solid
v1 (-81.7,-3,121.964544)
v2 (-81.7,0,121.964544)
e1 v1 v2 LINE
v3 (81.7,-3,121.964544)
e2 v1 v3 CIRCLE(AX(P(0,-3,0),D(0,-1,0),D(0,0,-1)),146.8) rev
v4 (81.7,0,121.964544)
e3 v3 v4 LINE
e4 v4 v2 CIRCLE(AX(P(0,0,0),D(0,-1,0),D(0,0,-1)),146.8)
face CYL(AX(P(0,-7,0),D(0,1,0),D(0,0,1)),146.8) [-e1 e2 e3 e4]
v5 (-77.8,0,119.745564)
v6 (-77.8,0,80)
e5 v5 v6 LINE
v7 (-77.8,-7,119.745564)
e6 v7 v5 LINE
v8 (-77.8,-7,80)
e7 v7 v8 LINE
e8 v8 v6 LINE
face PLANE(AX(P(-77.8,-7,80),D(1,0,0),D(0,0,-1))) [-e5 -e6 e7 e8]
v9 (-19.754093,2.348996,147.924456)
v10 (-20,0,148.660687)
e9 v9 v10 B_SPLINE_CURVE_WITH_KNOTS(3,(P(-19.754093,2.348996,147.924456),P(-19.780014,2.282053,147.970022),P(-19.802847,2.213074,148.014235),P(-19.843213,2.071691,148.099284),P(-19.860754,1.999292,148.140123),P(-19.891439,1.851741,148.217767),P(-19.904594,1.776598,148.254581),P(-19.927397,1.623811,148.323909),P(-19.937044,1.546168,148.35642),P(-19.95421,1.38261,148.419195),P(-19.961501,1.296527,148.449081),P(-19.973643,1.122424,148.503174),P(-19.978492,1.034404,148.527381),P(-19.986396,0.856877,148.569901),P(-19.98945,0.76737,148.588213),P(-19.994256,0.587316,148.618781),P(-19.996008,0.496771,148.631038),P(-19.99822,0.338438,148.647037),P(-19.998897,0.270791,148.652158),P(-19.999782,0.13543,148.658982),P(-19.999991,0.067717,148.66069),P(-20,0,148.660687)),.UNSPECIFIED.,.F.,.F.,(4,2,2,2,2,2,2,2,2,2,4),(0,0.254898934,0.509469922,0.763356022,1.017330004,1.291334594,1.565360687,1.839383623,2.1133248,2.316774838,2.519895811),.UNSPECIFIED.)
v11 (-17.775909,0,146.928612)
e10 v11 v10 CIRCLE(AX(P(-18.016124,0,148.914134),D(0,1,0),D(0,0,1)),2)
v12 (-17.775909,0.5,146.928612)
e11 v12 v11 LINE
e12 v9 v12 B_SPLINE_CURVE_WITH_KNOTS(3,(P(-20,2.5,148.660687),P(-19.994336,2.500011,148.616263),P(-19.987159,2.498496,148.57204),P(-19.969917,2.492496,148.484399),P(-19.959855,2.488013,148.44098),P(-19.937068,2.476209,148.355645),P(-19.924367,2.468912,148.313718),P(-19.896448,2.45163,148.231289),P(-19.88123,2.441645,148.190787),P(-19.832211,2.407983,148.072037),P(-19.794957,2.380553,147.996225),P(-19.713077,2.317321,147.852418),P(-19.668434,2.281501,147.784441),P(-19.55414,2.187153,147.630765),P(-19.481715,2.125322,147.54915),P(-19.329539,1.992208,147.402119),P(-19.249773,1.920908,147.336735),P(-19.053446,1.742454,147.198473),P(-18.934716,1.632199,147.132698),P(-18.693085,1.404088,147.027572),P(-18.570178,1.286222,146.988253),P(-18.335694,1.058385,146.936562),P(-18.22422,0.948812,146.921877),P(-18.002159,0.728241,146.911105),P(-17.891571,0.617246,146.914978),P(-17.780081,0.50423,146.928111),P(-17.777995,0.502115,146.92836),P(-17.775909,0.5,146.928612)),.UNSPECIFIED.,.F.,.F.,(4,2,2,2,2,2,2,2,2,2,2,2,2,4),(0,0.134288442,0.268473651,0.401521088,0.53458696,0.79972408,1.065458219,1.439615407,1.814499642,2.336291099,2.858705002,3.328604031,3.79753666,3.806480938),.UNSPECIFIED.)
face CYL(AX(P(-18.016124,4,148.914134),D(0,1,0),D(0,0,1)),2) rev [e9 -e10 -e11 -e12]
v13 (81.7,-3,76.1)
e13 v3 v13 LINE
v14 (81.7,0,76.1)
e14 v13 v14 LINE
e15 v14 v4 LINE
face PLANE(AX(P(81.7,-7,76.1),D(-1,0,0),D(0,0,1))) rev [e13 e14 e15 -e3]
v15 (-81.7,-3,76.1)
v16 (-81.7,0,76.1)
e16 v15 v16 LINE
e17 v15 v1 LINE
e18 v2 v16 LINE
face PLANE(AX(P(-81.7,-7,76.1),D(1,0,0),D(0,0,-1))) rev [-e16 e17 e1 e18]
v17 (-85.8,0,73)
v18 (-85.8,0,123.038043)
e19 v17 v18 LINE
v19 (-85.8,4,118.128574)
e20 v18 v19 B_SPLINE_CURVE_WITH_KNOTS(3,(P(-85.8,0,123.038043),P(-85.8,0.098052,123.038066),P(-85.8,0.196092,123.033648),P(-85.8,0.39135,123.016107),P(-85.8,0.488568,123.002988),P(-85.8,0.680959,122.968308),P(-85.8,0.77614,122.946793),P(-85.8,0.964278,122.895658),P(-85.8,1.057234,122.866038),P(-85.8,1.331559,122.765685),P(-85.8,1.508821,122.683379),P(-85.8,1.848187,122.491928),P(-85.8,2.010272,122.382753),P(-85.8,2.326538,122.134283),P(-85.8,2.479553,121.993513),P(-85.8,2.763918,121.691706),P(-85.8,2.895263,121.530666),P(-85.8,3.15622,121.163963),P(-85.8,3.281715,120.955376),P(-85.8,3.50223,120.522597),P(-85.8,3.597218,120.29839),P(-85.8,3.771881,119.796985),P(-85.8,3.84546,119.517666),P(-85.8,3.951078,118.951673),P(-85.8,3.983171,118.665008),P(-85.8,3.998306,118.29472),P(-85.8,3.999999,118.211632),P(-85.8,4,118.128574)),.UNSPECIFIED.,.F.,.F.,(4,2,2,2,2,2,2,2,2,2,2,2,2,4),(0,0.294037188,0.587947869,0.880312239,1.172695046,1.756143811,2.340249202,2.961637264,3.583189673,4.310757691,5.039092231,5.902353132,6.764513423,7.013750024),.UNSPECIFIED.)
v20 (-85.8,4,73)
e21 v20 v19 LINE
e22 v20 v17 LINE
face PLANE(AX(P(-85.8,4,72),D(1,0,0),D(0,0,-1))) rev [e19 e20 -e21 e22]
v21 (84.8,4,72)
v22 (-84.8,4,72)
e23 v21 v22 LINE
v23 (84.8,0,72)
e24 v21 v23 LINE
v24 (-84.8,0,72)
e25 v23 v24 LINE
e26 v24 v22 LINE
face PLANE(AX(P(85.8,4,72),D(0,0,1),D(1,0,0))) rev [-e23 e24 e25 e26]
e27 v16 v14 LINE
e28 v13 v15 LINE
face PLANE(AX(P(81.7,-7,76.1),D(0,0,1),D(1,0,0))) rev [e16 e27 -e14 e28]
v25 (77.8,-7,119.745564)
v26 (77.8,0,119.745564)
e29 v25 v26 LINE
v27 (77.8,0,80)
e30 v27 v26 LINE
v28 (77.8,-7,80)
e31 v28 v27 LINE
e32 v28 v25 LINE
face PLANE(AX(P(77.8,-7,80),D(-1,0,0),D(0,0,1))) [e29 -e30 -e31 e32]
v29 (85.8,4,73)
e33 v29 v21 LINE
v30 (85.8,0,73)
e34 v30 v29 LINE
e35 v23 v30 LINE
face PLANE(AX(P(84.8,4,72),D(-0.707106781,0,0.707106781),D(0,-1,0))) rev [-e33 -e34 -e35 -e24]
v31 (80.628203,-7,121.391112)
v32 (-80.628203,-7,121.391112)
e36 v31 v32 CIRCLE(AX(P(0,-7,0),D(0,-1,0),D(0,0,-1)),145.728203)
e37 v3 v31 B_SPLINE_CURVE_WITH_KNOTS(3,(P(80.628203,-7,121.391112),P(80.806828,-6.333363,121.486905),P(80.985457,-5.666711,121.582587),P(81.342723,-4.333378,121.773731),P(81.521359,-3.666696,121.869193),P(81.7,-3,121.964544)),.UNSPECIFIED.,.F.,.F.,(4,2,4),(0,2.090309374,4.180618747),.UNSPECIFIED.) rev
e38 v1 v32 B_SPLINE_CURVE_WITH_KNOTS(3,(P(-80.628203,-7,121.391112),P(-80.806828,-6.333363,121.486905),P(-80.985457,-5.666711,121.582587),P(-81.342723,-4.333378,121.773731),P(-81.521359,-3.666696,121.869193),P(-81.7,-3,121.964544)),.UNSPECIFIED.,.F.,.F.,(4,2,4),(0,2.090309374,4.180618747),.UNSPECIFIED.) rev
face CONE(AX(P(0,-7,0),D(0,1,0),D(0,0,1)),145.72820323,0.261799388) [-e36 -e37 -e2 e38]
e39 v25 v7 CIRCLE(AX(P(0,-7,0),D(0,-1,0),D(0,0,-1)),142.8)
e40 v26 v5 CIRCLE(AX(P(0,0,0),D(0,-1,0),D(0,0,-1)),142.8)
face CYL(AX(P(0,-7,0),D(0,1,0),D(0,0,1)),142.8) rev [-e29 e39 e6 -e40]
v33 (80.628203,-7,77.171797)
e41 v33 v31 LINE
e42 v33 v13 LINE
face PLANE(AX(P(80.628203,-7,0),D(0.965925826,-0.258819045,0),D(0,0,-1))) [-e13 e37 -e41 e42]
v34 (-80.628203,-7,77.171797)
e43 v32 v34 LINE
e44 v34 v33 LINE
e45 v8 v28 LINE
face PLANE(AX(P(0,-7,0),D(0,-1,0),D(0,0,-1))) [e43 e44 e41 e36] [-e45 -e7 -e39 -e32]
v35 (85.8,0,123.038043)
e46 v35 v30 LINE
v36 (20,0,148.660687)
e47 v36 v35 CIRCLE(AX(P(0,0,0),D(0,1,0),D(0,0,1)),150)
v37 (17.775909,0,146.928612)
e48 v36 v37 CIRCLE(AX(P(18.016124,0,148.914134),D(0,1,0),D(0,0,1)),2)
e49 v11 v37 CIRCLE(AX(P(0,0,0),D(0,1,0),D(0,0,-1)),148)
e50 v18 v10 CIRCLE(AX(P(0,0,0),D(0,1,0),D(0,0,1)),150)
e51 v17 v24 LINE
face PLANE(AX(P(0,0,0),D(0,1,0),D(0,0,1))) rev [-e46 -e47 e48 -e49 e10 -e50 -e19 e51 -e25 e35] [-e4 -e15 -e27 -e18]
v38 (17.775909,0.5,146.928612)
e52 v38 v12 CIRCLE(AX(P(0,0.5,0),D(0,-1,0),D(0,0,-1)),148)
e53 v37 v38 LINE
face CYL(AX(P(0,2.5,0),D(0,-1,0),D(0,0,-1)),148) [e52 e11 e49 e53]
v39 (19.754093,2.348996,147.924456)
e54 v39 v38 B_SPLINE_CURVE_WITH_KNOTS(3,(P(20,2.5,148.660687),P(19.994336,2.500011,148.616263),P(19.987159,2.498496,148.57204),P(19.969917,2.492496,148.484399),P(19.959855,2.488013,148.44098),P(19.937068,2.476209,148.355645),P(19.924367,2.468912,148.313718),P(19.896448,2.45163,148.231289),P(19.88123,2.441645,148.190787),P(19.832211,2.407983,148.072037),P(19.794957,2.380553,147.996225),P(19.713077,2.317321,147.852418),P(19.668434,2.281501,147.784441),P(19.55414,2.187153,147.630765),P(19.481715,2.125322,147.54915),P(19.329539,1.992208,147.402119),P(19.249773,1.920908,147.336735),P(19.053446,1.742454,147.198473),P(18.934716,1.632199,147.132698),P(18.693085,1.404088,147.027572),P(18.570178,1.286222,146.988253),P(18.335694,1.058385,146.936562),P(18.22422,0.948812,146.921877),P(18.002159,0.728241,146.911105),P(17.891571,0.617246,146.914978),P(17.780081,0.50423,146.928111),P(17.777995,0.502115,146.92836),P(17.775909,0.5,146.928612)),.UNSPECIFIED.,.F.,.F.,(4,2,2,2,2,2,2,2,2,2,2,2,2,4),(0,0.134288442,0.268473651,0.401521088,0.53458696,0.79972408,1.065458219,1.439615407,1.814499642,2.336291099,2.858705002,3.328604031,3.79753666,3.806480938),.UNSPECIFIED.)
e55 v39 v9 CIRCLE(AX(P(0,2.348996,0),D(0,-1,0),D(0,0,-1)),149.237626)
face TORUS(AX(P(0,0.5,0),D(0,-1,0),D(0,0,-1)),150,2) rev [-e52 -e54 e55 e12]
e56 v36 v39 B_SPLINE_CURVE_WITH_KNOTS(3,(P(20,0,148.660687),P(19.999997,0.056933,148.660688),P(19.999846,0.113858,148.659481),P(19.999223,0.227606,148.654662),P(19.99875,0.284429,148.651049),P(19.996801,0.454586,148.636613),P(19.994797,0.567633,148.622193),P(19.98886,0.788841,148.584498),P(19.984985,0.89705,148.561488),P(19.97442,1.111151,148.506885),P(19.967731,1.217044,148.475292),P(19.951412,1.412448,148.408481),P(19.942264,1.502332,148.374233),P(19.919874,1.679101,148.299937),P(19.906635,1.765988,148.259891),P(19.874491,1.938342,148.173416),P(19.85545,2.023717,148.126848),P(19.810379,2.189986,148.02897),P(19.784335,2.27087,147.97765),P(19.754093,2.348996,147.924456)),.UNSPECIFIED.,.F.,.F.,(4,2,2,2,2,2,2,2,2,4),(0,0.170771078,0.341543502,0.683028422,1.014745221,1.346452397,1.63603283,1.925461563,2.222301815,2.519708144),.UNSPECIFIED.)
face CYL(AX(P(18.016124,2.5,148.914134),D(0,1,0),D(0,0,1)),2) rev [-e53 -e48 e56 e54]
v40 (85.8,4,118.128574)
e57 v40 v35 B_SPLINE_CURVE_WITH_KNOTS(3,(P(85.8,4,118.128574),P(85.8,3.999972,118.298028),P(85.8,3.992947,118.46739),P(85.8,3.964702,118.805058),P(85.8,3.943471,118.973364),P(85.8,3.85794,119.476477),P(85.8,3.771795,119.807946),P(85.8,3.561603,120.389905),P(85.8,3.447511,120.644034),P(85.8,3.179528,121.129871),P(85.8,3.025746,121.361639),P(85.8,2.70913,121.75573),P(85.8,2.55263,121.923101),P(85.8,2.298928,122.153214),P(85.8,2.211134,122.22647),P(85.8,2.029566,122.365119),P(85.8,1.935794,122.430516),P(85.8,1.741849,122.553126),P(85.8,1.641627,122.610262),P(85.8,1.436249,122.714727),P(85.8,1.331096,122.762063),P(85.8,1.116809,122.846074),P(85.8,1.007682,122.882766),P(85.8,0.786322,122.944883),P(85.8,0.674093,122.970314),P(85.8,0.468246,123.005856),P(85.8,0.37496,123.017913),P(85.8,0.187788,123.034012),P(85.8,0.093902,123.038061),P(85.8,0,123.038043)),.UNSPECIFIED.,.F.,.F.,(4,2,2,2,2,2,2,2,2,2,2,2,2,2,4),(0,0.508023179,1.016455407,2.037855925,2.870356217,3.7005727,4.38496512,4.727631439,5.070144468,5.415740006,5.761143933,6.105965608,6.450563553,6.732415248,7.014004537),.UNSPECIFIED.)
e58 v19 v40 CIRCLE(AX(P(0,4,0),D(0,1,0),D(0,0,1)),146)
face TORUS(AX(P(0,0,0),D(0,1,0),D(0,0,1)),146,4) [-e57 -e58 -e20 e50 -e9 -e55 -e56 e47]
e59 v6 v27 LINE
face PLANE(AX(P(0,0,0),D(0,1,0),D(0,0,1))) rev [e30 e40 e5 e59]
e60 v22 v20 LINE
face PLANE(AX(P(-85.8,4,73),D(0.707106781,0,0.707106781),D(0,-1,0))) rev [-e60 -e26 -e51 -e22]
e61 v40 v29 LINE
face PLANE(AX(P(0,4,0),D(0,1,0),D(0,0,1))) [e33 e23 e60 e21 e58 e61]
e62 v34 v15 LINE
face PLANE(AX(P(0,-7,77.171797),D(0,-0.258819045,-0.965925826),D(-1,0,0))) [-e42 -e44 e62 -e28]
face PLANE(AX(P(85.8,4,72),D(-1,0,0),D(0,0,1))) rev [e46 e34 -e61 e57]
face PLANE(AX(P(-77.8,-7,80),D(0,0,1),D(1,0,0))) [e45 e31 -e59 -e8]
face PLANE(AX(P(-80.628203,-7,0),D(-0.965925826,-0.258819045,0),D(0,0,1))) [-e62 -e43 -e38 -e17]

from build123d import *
from OCP.BRepFilletAPI import BRepFilletAPI_MakeChamfer

# Parameters (mm, degrees)
EXTRUDE_1_DEPTH     = 4
CHAMFER_1_SIZE      = 1
EXTRUDE_2_DEPTH     = 7
CHAMFER_2_SIZE      = 4
CHAMFER_2_SIZE2     = 1.07179677
CUT_EXTRUDE_1_DEPTH = 2.5
FILLET_1_R          = 2
FILLET_2_R          = 4


with BuildPart() as part:
    # 스케치1 → 보스-돌출1 (new body)
    with BuildSketch(Plane(origin=(0, 0, 0), x_dir=(1, 0, 0), z_dir=(0, 1, 0))):
        with BuildLine():
            Line((85.8, -72), (85.8, -123.038042897))
            ThreePointArc((85.8, -123.038042897), (0, -150), (-85.8, -123.038042897))
            Line((-85.8, -123.038042897), (-85.8, -72))
            Line((-85.8, -72), (85.8, -72))
        make_face()
    extrude(amount=EXTRUDE_1_DEPTH)

    # 모따기1
    chamfer_1_edges = [part.edges().sort_by_distance(p)[0] for p in [
        (85.8, 2, 72),
        (-85.8, 2, 72),
    ]]
    chamfer(chamfer_1_edges, length=CHAMFER_1_SIZE)

    # 스케치2 → 보스-돌출2 (add)
    with BuildSketch(Plane.XZ):
        with BuildLine():
            Line((-81.7, 76.1), (-81.7, 121.964544028))
            ThreePointArc((-81.7, 121.964544028), (0, 146.8), (81.7, 121.964544028))
            Line((81.7, 121.964544028), (81.7, 76.1))
            Line((81.7, 76.1), (-81.7, 76.1))
        make_face()
        with BuildLine():
            Line((-77.8, 80), (-77.8, 119.745563592))
            ThreePointArc((-77.8, 119.745563592), (0, 142.8), (77.8, 119.745563592))
            Line((77.8, 119.745563592), (77.8, 80))
            Line((77.8, 80), (-77.8, 80))
        make_face(mode=Mode.SUBTRACT)
    extrude(amount=EXTRUDE_2_DEPTH)

    # 모따기2: one chamfer whose edges measure the first distance from different faces: ONE call of the kernel's chamfer builder (chamfer() names one face for all edges)
    chamfer_2_edges_1 = [part.edges().sort_by_distance(p)[0] for p in [
        (0, -7, 146.8),
    ]]
    chamfer_2_side_1 = [part.faces().sort_by_distance(p)[0] for p in [
        (0, -3.5, 146.8),
    ]]
    chamfer_2_edges_2 = [part.edges().sort_by_distance(p)[0] for p in [
        (-81.7, -7, 99.032272014),
    ]]
    chamfer_2_side_2 = [part.faces().sort_by_distance(p)[0] for p in [
        (-81.7, -3.5, 99.032272014),
    ]]
    chamfer_2_edges_3 = [part.edges().sort_by_distance(p)[0] for p in [
        (0, -7, 76.1),
    ]]
    chamfer_2_side_3 = [part.faces().sort_by_distance(p)[0] for p in [
        (0, -3.5, 76.1),
    ]]
    chamfer_2_edges_4 = [part.edges().sort_by_distance(p)[0] for p in [
        (81.7, -7, 99.032272014),
    ]]
    chamfer_2_side_4 = [part.faces().sort_by_distance(p)[0] for p in [
        (81.7, -3.5, 99.032272014),
    ]]
    chamfer_2 = BRepFilletAPI_MakeChamfer(part.part.solid().wrapped)
    for e in chamfer_2_edges_1:
        chamfer_2.Add(CHAMFER_2_SIZE, CHAMFER_2_SIZE2, e.wrapped, chamfer_2_side_1[0].wrapped)  # the first distance lies on this face
    for e in chamfer_2_edges_2:
        chamfer_2.Add(CHAMFER_2_SIZE, CHAMFER_2_SIZE2, e.wrapped, chamfer_2_side_2[0].wrapped)  # the first distance lies on this face
    for e in chamfer_2_edges_3:
        chamfer_2.Add(CHAMFER_2_SIZE, CHAMFER_2_SIZE2, e.wrapped, chamfer_2_side_3[0].wrapped)  # the first distance lies on this face
    for e in chamfer_2_edges_4:
        chamfer_2.Add(CHAMFER_2_SIZE, CHAMFER_2_SIZE2, e.wrapped, chamfer_2_side_4[0].wrapped)  # the first distance lies on this face
    add(Compound.cast(chamfer_2.Shape()), mode=Mode.REPLACE)

    # 스케치3 → 컷-돌출1 (cut)
    with BuildSketch(Plane.XZ):
        with BuildLine():
            Line((20, 146.642422239), (20, 148.660687473))
            ThreePointArc((20, 148.660687473), (0, 150), (-20, 148.660687473))
            Line((-20, 148.660687473), (-20, 146.642422239))
            ThreePointArc((-20, 146.642422239), (0, 148), (20, 146.642422239))
        make_face()
    extrude(amount=-CUT_EXTRUDE_1_DEPTH, mode=Mode.SUBTRACT)

    # 필렛1
    # the kernel refuses this fillet: 2 mm, written as the material it adds along each edge
    with BuildSketch(Plane(origin=(20, 0, 146.642422239), x_dir=(-0.991822496989378, 0, 0.12762497586975344), z_dir=(0, 1, 0))) as fillet_1_piece_1:
        with BuildLine():
            CenterArc((2.257580225, 1.999942607), FILLET_1_R, 179.947910746, 89.618025307)
            Line((0.257581052, 2.001760865), (0.217581068, 2.00179723))
            ThreePointArc((0.217581068, 2.00179723), (0.089117626, 1.005985431), (-0.0396729, 0.005104999))
            Line((-0.0396729, 0.005104999), (0.000303031, -0.039998852))
            ThreePointArc((0.000303031, -0.039998852), (1.12121434, -0.035752907), (2.242125649, -0.039998852))
            Line((2.242125649, -0.039998852), (2.24242868, 0))
        make_face()
    extrude(amount=2.5)
    with BuildSketch(Plane(origin=(-20, 0, 146.642422239), x_dir=(0, 0, 1), z_dir=(0, 1, 0))) as fillet_1_piece_2:
        with BuildLine():
            CenterArc((2.271711692, 1.983876229), FILLET_1_R, 173.101693725, 89.618025307)
            Line((0.286189906, 2.224091213), (0.24647947, 2.228895513))
            ThreePointArc((0.24647947, 2.228895513), (0.107634416, 1.11660857), (-0.039633087, 0.005405405))
            Line((-0.039633087, 0.005405405), (0, -0.04))
            ThreePointArc((0, -0.04), (1.009132617, -0.04), (2.013196305, -0.039677525))
            Line((2.013196305, -0.039677525), (2.018265235, 0))
        make_face()
    extrude(amount=2.5)
    with BuildSketch(Plane(origin=(0, 2.5, 0), x_dir=(-0.16852594692662803, 0, 0.9856972178171568), z_dir=(-0.9856972178171568, 0, -0.16852594692662803))) as fillet_1_piece_3:
        with BuildLine():
            CenterArc((148 + FILLET_1_R, -FILLET_1_R), FILLET_1_R, 90, 90)
            Line((148 + FILLET_1_R, 0), (148 + FILLET_1_R, FILLET_1_R * 0.02))
            Line((148 + FILLET_1_R, FILLET_1_R * 0.02), (148 - FILLET_1_R * 0.02, FILLET_1_R * 0.02))
            Line((148 - FILLET_1_R * 0.02, FILLET_1_R * 0.02), (148 - FILLET_1_R * 0.02, -FILLET_1_R))
            Line((148 - FILLET_1_R * 0.02, -FILLET_1_R), (148, -FILLET_1_R))
        make_face()
    revolve(axis=Axis((0, 2.5, 0), (0, 1, 0)), revolution_arc=19.4042511)

    # 필렛2
    # the kernel refuses this fillet: 4 mm, written as the material it takes off along each edge
    with BuildSketch(Plane(origin=(0, 4, 0), x_dir=(0.6253849976440692, 0, 0.7803163491313813), z_dir=(0.7803163491313813, 0, -0.6253849976440692))) as fillet_2_piece_1_section:
        with BuildLine():
            CenterArc((150 - FILLET_2_R, FILLET_2_R), FILLET_2_R, 270, 90)
            Line((150 - FILLET_2_R, 0), (150 - FILLET_2_R, -FILLET_2_R * 0.02))
            Line((150 - FILLET_2_R, -FILLET_2_R * 0.02), (150 + FILLET_2_R * 0.02, -FILLET_2_R * 0.02))
            Line((150 + FILLET_2_R * 0.02, -FILLET_2_R * 0.02), (150 + FILLET_2_R * 0.02, FILLET_2_R))
            Line((150 + FILLET_2_R * 0.02, FILLET_2_R), (150, FILLET_2_R))
        make_face()
    fillet_2_piece_1 = revolve(axis=Axis((0, 4, 0), (0, -1, 0)), revolution_arc=77.420901677, mode=Mode.PRIVATE)
    fillet_2_piece_1 = split(fillet_2_piece_1, bisect_by=Plane(origin=(85.8, 2.892558324, 148.892558324), z_dir=(-1, 0, 0)), keep=Keep.TOP, mode=Mode.PRIVATE)
    fillet_2_piece_1 = split(fillet_2_piece_1, bisect_by=Plane(origin=(-85.8, 2.892558324, 148.892558324), z_dir=(1, 0, 0)), keep=Keep.TOP, mode=Mode.PRIVATE)
    add(fillet_2_piece_1, mode=Mode.SUBTRACT)


solid = part.part
